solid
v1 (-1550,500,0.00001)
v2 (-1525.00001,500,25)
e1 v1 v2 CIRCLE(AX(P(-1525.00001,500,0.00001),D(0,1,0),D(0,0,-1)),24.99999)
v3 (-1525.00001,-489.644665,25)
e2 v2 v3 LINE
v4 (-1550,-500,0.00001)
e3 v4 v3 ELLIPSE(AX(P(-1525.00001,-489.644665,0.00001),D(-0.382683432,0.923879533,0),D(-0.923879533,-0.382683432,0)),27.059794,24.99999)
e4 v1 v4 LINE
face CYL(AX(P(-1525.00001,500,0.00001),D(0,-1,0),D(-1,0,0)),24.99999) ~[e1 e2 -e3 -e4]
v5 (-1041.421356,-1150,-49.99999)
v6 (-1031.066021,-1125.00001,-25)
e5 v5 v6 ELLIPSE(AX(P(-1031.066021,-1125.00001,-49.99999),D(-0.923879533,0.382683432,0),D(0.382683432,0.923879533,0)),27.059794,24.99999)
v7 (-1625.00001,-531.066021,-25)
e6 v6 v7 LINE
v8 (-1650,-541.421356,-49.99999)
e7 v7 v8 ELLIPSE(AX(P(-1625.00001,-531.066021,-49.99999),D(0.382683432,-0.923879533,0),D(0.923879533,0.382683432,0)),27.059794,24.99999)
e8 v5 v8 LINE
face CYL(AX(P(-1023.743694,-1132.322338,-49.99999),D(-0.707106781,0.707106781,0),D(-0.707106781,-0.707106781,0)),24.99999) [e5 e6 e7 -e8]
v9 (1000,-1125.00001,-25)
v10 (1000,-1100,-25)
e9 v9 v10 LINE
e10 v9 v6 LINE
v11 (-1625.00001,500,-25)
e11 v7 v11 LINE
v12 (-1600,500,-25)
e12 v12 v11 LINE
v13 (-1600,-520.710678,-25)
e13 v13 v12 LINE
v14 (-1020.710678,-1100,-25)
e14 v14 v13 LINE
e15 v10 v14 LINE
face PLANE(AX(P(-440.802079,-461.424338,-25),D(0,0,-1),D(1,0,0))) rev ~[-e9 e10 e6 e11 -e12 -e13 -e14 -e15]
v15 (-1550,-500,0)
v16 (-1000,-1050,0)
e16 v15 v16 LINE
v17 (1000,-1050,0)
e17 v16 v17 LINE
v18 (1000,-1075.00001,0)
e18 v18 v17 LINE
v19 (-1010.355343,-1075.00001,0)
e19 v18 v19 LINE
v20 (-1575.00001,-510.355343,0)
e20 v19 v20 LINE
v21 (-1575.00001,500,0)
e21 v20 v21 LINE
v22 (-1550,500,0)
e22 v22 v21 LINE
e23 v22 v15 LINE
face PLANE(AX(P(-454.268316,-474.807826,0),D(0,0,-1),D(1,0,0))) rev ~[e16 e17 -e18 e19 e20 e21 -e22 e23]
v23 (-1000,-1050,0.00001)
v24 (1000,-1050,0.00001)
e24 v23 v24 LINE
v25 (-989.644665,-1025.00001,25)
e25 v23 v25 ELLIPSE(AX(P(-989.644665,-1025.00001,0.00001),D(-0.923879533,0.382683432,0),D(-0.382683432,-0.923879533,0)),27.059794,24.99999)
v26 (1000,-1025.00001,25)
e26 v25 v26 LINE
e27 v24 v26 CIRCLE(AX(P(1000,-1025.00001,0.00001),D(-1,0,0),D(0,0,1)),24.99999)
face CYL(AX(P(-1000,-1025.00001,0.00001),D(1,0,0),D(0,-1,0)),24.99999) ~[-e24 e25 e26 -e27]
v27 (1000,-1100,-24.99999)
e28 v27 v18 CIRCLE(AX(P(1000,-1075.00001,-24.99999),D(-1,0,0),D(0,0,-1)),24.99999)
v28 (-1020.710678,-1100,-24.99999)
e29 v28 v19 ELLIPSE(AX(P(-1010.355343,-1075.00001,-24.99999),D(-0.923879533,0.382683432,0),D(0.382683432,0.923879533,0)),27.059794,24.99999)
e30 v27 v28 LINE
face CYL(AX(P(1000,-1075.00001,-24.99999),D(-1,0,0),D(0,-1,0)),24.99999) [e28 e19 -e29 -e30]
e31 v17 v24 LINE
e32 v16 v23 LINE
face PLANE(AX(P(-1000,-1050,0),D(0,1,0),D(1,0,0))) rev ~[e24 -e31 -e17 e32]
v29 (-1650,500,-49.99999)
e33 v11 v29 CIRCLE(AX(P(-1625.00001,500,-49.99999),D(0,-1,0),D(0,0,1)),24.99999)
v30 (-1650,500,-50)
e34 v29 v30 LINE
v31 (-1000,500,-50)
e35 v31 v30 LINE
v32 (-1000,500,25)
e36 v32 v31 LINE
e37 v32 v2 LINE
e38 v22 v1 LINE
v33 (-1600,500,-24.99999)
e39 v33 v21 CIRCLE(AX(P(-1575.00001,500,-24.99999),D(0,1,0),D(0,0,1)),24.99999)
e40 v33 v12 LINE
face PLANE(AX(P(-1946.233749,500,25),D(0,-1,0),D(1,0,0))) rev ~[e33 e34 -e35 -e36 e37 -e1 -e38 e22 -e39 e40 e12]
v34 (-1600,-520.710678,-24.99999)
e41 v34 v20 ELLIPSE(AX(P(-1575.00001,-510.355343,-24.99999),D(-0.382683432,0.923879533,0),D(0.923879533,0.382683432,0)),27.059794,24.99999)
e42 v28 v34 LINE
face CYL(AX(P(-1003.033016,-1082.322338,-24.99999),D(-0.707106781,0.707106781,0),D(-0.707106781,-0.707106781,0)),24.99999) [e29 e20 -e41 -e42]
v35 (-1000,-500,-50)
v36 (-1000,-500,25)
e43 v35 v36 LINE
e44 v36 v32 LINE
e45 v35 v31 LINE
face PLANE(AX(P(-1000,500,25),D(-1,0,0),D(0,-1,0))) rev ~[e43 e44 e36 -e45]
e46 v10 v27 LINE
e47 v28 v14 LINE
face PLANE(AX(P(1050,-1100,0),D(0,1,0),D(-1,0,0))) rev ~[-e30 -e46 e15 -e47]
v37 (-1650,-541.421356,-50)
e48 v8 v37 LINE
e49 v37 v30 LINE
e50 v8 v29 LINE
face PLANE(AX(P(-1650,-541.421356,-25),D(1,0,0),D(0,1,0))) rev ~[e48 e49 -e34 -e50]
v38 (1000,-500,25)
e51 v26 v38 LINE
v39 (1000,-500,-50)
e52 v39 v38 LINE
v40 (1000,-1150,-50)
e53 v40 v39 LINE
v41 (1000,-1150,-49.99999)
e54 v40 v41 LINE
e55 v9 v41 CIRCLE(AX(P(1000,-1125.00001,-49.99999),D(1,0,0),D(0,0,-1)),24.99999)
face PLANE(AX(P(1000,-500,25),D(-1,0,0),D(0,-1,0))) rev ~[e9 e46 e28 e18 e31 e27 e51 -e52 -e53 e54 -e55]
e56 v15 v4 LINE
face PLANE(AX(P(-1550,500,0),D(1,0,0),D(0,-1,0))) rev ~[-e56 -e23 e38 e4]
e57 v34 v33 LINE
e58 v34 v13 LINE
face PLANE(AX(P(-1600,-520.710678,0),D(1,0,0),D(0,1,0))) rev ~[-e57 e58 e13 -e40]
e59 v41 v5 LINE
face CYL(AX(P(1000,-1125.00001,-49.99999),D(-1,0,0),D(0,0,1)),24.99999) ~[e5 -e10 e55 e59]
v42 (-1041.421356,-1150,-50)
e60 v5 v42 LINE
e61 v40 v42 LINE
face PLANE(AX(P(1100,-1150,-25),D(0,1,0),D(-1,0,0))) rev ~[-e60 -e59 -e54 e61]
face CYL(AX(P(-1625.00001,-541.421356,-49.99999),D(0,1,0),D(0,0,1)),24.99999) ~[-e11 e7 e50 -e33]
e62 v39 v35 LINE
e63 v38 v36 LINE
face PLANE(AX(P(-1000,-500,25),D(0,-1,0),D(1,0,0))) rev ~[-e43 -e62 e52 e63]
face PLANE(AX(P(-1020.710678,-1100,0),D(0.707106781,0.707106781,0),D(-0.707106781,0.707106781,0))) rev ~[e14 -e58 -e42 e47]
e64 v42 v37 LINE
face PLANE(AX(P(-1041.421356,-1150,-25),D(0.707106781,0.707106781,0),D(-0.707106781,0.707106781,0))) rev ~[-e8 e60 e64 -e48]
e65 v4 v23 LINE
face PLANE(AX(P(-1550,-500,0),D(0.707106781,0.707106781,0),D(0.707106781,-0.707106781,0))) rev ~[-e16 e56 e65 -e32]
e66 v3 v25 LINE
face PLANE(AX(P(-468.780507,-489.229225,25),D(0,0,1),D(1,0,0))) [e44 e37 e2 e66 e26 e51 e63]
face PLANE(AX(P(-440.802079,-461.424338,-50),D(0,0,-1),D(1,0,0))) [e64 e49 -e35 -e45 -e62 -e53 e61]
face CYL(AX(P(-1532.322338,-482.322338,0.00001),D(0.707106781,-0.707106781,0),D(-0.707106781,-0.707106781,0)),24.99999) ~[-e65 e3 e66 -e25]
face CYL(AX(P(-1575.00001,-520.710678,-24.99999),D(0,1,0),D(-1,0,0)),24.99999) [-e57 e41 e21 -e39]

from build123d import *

# Parameters (mm, degrees)
F1_DEPTH = 25
F3_DEPTH = 25
F5_DEPTH = 25
F7_DEPTH = 720
F8_R     = 24.99999


# Not quite as in the source:
# - a fillet or chamfer is up to 0.001 mm smaller than in the source, because OpenCascade refuses the exact size


with BuildPart() as f1:
    # F0 (on Top) → F1 (new body)
    with BuildSketch(Plane.XY):
        Polygon((-1000, -500), (-1000, 500), (-1550, 500), (-1550, -500), (-1000, -1050), (1000, -1050), (1000, -500), align=None)
    extrude(amount=F1_DEPTH)

    # F2 (on face) → F3 (join)
    with BuildSketch(Plane(origin=(0, 0, 0), x_dir=(1, 0, 0), z_dir=(0, 0, -1))):
        Polygon((-1020.7106781187, 1100), (-1600, 520.7106781187), (-1600, -550), (-950, -550), (-950, 450), (1050, 450), (1050, 1100), align=None)
    extrude(amount=F3_DEPTH)

    # F4 (on face) → F5 (join)
    with BuildSketch(Plane(origin=(0, 0, -25), x_dir=(1, 0, 0), z_dir=(0, 0, -1))):
        Polygon((-1041.4213562373, 1150), (-1650, 541.4213562373), (-1650, -600), (-900, -600), (-900, 400), (1100, 400), (1100, 1150), align=None)
    extrude(amount=F5_DEPTH)

    # F6 (on face) → F7 (cut)
    with BuildSketch(Plane.XY.offset(25)):
        Polygon((-1950.9481191635, 705.582857132), (-1946.2337493896, 500), (-1000, 500), (-1000, -500), (1000, -500), (1000, -1340.4409885406), (1594.2358970642, -1340.4409885406), (1594.2358970642, 705.582857132), align=None)
    extrude(amount=-F7_DEPTH, mode=Mode.SUBTRACT)

    # F8 (radius 25 in the source; OpenCascade refuses exactly that, so slightly less here)
    f8_edges = [f1.edges().sort_by_distance(p)[0] for p in [
        (-1550, 0, 25),
        (-1600, -10.355339, 0),
        (-1650, -20.710678, -25),
        (-1275, -775, 25),
        (-1310.355339, -810.355339, 0),
        (-1345.710678, -845.710678, -25),
        (0, -1050, 25),
        (-10.355339, -1100, 0),
        (-20.710678, -1150, -25),
    ]]
    fillet(f8_edges, radius=F8_R)


solid = f1.part
